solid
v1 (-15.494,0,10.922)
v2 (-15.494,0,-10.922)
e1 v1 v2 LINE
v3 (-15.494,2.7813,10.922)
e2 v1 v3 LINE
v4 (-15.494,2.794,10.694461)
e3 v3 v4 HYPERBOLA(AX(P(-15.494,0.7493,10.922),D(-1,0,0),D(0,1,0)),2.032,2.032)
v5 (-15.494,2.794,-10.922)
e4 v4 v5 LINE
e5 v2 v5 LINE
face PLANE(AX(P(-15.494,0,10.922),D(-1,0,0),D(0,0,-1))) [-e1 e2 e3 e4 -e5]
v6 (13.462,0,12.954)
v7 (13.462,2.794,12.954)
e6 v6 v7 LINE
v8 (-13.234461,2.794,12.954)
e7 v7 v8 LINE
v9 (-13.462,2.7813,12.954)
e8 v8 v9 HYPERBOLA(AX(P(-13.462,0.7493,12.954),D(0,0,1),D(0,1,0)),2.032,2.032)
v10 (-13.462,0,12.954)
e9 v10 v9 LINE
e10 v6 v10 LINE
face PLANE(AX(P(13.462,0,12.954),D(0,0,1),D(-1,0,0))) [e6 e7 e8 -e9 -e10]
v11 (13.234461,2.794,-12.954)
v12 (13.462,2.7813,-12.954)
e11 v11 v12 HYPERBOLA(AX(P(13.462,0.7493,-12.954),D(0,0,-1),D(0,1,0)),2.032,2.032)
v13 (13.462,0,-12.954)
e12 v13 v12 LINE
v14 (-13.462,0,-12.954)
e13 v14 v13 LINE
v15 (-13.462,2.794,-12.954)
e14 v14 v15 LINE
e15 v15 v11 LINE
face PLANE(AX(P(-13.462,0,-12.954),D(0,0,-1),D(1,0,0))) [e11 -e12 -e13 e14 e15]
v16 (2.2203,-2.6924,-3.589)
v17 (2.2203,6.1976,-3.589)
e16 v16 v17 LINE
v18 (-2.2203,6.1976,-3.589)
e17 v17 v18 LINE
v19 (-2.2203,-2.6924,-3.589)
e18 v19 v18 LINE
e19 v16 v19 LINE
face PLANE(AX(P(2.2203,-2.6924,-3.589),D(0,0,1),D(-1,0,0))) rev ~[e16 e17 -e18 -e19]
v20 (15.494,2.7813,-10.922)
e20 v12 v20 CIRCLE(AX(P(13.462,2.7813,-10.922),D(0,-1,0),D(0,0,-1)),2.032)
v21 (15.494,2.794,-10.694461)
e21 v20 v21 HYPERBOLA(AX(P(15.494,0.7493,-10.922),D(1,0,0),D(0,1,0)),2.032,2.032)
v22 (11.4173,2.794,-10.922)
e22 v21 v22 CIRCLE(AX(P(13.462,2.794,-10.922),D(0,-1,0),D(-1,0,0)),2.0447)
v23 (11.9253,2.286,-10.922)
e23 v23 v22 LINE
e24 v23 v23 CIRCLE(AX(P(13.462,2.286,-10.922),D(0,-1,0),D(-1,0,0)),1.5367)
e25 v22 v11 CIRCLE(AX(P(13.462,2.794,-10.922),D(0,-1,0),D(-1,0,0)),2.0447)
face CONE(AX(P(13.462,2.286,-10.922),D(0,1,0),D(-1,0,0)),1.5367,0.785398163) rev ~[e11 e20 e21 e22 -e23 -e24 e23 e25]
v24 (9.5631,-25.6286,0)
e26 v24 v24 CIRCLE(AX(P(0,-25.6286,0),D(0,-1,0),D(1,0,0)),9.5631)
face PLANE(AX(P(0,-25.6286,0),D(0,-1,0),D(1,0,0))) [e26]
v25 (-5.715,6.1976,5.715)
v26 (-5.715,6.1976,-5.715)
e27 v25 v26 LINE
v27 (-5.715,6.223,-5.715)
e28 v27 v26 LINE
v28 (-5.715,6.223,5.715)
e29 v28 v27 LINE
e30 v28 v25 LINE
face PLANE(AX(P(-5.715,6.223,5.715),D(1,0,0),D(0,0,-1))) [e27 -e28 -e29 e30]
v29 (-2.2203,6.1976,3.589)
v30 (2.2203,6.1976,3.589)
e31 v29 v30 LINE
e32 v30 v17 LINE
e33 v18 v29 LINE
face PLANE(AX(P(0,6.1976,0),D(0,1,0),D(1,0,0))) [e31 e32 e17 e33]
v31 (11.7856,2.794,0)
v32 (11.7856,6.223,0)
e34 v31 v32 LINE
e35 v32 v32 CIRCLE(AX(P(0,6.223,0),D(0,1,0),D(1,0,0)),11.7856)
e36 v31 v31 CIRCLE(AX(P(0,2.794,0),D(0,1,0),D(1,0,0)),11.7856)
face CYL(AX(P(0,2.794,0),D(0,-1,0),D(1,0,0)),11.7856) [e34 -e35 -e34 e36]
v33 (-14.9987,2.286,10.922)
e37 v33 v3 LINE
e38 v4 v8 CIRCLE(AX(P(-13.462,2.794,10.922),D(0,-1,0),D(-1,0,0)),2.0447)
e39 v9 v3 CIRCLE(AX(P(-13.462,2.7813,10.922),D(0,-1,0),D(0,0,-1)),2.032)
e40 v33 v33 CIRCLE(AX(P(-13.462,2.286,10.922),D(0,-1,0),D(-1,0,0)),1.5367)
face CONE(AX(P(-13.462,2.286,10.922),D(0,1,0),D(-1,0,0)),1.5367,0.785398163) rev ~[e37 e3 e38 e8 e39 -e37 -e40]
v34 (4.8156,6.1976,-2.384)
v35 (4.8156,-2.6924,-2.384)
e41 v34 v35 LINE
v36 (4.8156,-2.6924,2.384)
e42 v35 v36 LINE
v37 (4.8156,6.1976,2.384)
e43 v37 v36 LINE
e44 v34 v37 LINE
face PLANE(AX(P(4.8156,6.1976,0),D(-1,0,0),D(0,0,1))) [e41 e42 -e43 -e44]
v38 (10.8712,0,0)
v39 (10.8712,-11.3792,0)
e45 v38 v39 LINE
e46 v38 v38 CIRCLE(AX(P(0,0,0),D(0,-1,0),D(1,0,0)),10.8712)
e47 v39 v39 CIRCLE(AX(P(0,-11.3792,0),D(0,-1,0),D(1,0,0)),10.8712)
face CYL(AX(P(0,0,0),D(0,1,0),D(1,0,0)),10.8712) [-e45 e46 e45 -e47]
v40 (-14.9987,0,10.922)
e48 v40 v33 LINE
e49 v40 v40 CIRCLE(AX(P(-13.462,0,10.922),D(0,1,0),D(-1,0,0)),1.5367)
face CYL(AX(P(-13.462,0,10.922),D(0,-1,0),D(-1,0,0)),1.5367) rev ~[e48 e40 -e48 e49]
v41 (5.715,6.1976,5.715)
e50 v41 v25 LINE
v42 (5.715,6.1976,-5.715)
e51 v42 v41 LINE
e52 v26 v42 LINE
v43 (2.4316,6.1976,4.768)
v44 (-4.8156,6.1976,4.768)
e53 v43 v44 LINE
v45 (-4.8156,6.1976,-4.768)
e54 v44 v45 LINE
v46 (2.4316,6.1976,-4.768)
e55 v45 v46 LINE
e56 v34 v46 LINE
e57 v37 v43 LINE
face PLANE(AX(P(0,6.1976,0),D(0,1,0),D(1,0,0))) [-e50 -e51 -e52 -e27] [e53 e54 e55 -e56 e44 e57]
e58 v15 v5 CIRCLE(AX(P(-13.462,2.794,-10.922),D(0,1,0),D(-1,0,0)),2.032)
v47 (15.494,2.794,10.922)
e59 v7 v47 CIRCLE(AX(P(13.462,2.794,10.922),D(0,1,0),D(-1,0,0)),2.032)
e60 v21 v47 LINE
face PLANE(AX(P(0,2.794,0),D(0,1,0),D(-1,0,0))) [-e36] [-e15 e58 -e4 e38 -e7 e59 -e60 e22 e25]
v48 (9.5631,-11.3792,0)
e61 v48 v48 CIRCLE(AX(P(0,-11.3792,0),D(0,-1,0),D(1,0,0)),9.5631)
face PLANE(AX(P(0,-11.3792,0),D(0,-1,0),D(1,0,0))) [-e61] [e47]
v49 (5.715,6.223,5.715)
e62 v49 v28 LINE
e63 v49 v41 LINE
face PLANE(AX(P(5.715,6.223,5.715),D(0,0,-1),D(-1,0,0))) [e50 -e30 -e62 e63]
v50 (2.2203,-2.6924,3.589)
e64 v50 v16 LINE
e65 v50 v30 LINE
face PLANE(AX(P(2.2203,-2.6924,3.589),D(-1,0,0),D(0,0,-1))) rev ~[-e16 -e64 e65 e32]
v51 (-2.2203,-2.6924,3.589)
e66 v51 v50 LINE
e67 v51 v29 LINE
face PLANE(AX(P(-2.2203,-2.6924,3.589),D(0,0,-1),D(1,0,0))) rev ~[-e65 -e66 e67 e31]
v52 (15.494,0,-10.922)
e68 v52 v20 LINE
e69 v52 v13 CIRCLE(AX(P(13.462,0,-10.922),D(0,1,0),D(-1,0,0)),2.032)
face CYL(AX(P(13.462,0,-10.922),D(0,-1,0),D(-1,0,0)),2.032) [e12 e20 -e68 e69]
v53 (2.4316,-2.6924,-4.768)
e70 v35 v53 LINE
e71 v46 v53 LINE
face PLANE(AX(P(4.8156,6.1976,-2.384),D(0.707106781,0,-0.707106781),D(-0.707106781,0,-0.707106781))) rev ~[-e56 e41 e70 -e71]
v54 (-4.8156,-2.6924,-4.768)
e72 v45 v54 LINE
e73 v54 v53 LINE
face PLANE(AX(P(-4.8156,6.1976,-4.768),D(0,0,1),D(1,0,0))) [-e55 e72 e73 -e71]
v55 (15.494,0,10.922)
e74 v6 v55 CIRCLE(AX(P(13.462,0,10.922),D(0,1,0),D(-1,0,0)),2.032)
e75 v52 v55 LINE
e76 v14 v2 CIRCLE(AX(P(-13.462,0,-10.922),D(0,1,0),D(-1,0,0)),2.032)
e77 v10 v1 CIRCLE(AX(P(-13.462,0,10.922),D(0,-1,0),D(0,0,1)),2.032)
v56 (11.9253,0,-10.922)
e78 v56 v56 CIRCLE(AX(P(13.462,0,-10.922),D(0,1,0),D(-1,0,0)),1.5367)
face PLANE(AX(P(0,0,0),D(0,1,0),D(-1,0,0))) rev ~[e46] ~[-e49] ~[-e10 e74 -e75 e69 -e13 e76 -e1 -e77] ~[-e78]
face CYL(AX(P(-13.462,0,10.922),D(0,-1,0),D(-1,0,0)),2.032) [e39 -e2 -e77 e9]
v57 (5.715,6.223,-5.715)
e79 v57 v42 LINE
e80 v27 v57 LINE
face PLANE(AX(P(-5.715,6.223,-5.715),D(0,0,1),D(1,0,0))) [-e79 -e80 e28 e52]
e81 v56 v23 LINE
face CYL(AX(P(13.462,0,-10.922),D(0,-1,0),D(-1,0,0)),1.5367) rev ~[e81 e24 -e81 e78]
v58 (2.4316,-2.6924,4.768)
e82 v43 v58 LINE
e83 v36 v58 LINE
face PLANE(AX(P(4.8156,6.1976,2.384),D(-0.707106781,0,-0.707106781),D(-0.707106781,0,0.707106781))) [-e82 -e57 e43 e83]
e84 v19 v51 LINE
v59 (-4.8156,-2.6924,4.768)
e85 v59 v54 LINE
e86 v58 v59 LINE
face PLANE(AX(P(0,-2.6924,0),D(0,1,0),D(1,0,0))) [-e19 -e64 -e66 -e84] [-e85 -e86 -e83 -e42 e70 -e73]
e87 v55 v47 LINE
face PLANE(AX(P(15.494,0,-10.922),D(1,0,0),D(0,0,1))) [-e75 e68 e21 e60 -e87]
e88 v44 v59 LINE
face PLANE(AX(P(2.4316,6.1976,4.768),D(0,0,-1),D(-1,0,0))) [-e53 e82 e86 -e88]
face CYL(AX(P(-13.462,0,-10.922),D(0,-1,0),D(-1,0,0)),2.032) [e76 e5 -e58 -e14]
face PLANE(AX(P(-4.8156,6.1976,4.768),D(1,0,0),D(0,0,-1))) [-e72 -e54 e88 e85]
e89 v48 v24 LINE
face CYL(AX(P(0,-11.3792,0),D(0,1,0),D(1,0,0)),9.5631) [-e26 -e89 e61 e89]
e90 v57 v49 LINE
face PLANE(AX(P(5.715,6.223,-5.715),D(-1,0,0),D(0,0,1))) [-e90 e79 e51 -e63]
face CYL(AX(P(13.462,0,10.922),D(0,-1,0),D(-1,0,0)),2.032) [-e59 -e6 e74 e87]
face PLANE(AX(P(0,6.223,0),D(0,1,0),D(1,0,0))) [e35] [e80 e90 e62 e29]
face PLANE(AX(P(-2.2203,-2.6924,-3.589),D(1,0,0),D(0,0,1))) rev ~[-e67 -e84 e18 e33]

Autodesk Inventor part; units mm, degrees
ref_plane "YZ Plane" through (0, 0, 0) normal (1, 0, 0) x (0, 1, 0)
ref_plane "XZ Plane" through (0, 0, 0) normal (0, 1, 0) x (-1, 0, 0)
ref_plane "XY Plane" through (0, 0, 0) normal (0, 0, 1) x (1, 0, 0)
sketch "Sketch1" plane through (0, 0, 0) normal (0, 1, 0) x (-1, 0, 0)
  line L0 (-15.494, 12.954) -> (15.494, 12.954)
  line L1 (15.494, 12.954) -> (15.494, -12.954)
  line L2 (15.494, -12.954) -> (-15.494, -12.954)
  line L3 (-15.494, -12.954) -> (-15.494, 12.954)
  line L4 (-15.494, 12.954) -> (15.494, -12.954) construction
  line L5 (15.494, 12.954) -> (-15.494, -12.954) construction
  line L6 (15.494, 12.954) -> (0, 0)
  line L7 (15.494, 12.954) -> (13.462, 12.954)
  line L8 (13.462, 12.954) -> (13.462, 10.922)
  line L9 (13.462, 10.922) -> (15.494, 10.922)
  circle A0 centre (13.462, 10.922) radius 2.032
  line L10 (-15.494, -12.954) -> (-13.462, -12.954)
  line L11 (-13.462, -12.954) -> (-13.462, -10.922)
  line L12 (-13.462, -10.922) -> (-15.494, -10.922)
  line L13 (-15.494, -10.922) -> (-15.494, -12.954)
  line L14 (-15.494, 12.954) -> (-13.462, 12.954)
  line L15 (-13.462, 12.954) -> (-13.462, 10.922)
  line L16 (-13.462, 10.922) -> (-15.494, 10.922)
  line L17 (-15.494, 10.922) -> (-15.494, 12.954)
  line L18 (15.494, -12.954) -> (13.462, -12.954)
  line L19 (13.462, -12.954) -> (13.462, -10.922)
  line L20 (13.462, -10.922) -> (15.494, -10.922)
  line L21 (15.494, -10.922) -> (15.494, -12.954)
  circle A1 centre (13.462, -10.922) radius 2.032
  circle A2 centre (-13.462, 10.922) radius 2.032
  circle A3 centre (-13.462, -10.922) radius 2.032
  circle A4 centre (-13.462, 10.922) radius 1.5367
  circle A5 centre (13.462, 10.922) radius 1.5367
  circle A6 centre (13.462, -10.922) radius 1.5367
  circle A7 centre (-13.462, -10.922) radius 1.5367
  dimension "d0" = 30.988
  dimension "d1" = 25.908
  dimension "d2" = 2.032
  dimension "d3" = 2.032
  dimension "d4" = 2.032
  dimension "d5" = 2.032
  dimension "d6" = 3.0734
extrude "Extrusion1" add sketch "Sketch1" along normal blind 2.794 contours A2 L16 A4 L15 | L0 A0 L1 A1 L2 A3 L3 A2 | L15 A4 L16 A2 | A0 L6 A5 L8 | L8 A5 L6 A0 | A3 L11 A7 L12 | L12 A7 L11 A3 | A0 L9 A5 L6 | L6 A5 L9 A0 | A1 L20 A6 L19 | L19 A6 L20 A1
sketch "Sketch2" plane through (0, 2.794, 0) normal (0, 1, 0) x (1, 0, 0)
  circle A0 centre (-13.462, 10.922) radius 1.5367 projected
  circle A1 centre (-13.462, 10.922) radius 1.5367
  circle A2 centre (13.462, -10.922) radius 1.5367 projected
  circle A3 centre (13.462, -10.922) radius 1.5367
  point P0 (0, 0)
extrude "Extrusion2" add sketch "Sketch2" against normal blind 2.794
sketch "Sketch3" plane through (0, 2.794, 0) normal (0, 1, 0) x (1, 0, 0)
  circle A0 centre (0, 0) radius 11.7856
  dimension "d11" = 23.5712
extrude "Extrusion3" add sketch "Sketch3" along normal blind 3.429
sketch "Sketch4" plane through (0, 0, 0) normal (0, -1, 0) x (1, 0, 0)
  circle A0 centre (0, 0) radius 10.8712
  dimension "d14" = 21.7424
extrude "Extrusion4" add sketch "Sketch4" along normal blind 11.3792
sketch "Sketch5" plane through (0, -11.3792, 0) normal (0, -1, 0) x (1, 0, 0)
  circle A0 centre (0, 0) radius 9.5631
  dimension "d17" = 19.1262
extrude "Extrusion5" add sketch "Sketch5" along normal blind 14.2494
sketch "Sketch6" plane through (0, 6.223, 0) normal (0, 1, 0) x (1, 0, 0)
  line L0 (5.715, -5.715) -> (-5.715, -5.715)
  line L1 (-5.715, -5.715) -> (-5.715, 5.715)
  line L2 (-5.715, 5.715) -> (5.715, 5.715)
  line L3 (5.715, 5.715) -> (5.715, -5.715)
  line L4 (5.715, -5.715) -> (-5.715, 5.715) construction
  line L5 (-5.715, -5.715) -> (5.715, 5.715) construction
  point P0 (0, 0)
  dimension "d20" = 11.43
  dimension "d21" = 11.43
extrude "Extrusion6" cut sketch "Sketch6" against normal blind 0.0254
sketch "Sketch7" plane through (0, 6.1976, 0) normal (0, 1, 0) x (1, 0, 0)
  line L0 (4.8156, -4.768) -> (-4.8156, -4.768)
  line L1 (-4.8156, -4.768) -> (-4.8156, 4.768)
  line L2 (-4.8156, 4.768) -> (4.8156, 4.768)
  line L3 (4.8156, 4.768) -> (4.8156, -4.768)
  line L4 (4.8156, -4.768) -> (-4.8156, 4.768) construction
  line L5 (-4.8156, -4.768) -> (4.8156, 4.768) construction
  line L6 (4.8156, -4.768) -> (4.8156, 0)
  line L7 (4.8156, -2.384) -> (2.4316, -4.768)
  line L8 (4.8156, -2.384) -> (8.1872, -2.384) construction
  line L9 (4.8156, 0) -> (4.8156, 4.768)
  line L10 (4.8156, 2.384) -> (2.4316, 4.768)
  line L11 (4.8156, 2.384) -> (8.1872, 2.384) construction
  point P0 (0, 0)
  dimension "d24" = 135
  dimension "d25" = 135
extrude "Extrusion7" cut sketch "Sketch7" against normal blind 8.89 contours L0 L1 L2 L10 L3 L7
sketch "Sketch8" plane through (0, -2.6924, 0) normal (0, 1, 0) x (1, 0, 0)
  line L0 (-2.2203, -3.589) -> (2.2203, -3.589)
  line L1 (2.2203, -3.589) -> (2.2203, 3.589)
  line L2 (2.2203, 3.589) -> (-2.2203, 3.589)
  line L3 (-2.2203, 3.589) -> (-2.2203, -3.589)
  line L4 (-2.2203, -3.589) -> (2.2203, 3.589) construction
  line L5 (2.2203, -3.589) -> (-2.2203, 3.589) construction
  point P0 (0, 0)
extrude "Extrusion8" add sketch "Sketch8" along normal blind 8.89
chamfer "Chamfer1" distance 0.508 angle 45 2 edges at (-11.9253, 2.794, 10.922) (14.9987, 2.794, -10.922)
properties part number "USB Type B Socket"
